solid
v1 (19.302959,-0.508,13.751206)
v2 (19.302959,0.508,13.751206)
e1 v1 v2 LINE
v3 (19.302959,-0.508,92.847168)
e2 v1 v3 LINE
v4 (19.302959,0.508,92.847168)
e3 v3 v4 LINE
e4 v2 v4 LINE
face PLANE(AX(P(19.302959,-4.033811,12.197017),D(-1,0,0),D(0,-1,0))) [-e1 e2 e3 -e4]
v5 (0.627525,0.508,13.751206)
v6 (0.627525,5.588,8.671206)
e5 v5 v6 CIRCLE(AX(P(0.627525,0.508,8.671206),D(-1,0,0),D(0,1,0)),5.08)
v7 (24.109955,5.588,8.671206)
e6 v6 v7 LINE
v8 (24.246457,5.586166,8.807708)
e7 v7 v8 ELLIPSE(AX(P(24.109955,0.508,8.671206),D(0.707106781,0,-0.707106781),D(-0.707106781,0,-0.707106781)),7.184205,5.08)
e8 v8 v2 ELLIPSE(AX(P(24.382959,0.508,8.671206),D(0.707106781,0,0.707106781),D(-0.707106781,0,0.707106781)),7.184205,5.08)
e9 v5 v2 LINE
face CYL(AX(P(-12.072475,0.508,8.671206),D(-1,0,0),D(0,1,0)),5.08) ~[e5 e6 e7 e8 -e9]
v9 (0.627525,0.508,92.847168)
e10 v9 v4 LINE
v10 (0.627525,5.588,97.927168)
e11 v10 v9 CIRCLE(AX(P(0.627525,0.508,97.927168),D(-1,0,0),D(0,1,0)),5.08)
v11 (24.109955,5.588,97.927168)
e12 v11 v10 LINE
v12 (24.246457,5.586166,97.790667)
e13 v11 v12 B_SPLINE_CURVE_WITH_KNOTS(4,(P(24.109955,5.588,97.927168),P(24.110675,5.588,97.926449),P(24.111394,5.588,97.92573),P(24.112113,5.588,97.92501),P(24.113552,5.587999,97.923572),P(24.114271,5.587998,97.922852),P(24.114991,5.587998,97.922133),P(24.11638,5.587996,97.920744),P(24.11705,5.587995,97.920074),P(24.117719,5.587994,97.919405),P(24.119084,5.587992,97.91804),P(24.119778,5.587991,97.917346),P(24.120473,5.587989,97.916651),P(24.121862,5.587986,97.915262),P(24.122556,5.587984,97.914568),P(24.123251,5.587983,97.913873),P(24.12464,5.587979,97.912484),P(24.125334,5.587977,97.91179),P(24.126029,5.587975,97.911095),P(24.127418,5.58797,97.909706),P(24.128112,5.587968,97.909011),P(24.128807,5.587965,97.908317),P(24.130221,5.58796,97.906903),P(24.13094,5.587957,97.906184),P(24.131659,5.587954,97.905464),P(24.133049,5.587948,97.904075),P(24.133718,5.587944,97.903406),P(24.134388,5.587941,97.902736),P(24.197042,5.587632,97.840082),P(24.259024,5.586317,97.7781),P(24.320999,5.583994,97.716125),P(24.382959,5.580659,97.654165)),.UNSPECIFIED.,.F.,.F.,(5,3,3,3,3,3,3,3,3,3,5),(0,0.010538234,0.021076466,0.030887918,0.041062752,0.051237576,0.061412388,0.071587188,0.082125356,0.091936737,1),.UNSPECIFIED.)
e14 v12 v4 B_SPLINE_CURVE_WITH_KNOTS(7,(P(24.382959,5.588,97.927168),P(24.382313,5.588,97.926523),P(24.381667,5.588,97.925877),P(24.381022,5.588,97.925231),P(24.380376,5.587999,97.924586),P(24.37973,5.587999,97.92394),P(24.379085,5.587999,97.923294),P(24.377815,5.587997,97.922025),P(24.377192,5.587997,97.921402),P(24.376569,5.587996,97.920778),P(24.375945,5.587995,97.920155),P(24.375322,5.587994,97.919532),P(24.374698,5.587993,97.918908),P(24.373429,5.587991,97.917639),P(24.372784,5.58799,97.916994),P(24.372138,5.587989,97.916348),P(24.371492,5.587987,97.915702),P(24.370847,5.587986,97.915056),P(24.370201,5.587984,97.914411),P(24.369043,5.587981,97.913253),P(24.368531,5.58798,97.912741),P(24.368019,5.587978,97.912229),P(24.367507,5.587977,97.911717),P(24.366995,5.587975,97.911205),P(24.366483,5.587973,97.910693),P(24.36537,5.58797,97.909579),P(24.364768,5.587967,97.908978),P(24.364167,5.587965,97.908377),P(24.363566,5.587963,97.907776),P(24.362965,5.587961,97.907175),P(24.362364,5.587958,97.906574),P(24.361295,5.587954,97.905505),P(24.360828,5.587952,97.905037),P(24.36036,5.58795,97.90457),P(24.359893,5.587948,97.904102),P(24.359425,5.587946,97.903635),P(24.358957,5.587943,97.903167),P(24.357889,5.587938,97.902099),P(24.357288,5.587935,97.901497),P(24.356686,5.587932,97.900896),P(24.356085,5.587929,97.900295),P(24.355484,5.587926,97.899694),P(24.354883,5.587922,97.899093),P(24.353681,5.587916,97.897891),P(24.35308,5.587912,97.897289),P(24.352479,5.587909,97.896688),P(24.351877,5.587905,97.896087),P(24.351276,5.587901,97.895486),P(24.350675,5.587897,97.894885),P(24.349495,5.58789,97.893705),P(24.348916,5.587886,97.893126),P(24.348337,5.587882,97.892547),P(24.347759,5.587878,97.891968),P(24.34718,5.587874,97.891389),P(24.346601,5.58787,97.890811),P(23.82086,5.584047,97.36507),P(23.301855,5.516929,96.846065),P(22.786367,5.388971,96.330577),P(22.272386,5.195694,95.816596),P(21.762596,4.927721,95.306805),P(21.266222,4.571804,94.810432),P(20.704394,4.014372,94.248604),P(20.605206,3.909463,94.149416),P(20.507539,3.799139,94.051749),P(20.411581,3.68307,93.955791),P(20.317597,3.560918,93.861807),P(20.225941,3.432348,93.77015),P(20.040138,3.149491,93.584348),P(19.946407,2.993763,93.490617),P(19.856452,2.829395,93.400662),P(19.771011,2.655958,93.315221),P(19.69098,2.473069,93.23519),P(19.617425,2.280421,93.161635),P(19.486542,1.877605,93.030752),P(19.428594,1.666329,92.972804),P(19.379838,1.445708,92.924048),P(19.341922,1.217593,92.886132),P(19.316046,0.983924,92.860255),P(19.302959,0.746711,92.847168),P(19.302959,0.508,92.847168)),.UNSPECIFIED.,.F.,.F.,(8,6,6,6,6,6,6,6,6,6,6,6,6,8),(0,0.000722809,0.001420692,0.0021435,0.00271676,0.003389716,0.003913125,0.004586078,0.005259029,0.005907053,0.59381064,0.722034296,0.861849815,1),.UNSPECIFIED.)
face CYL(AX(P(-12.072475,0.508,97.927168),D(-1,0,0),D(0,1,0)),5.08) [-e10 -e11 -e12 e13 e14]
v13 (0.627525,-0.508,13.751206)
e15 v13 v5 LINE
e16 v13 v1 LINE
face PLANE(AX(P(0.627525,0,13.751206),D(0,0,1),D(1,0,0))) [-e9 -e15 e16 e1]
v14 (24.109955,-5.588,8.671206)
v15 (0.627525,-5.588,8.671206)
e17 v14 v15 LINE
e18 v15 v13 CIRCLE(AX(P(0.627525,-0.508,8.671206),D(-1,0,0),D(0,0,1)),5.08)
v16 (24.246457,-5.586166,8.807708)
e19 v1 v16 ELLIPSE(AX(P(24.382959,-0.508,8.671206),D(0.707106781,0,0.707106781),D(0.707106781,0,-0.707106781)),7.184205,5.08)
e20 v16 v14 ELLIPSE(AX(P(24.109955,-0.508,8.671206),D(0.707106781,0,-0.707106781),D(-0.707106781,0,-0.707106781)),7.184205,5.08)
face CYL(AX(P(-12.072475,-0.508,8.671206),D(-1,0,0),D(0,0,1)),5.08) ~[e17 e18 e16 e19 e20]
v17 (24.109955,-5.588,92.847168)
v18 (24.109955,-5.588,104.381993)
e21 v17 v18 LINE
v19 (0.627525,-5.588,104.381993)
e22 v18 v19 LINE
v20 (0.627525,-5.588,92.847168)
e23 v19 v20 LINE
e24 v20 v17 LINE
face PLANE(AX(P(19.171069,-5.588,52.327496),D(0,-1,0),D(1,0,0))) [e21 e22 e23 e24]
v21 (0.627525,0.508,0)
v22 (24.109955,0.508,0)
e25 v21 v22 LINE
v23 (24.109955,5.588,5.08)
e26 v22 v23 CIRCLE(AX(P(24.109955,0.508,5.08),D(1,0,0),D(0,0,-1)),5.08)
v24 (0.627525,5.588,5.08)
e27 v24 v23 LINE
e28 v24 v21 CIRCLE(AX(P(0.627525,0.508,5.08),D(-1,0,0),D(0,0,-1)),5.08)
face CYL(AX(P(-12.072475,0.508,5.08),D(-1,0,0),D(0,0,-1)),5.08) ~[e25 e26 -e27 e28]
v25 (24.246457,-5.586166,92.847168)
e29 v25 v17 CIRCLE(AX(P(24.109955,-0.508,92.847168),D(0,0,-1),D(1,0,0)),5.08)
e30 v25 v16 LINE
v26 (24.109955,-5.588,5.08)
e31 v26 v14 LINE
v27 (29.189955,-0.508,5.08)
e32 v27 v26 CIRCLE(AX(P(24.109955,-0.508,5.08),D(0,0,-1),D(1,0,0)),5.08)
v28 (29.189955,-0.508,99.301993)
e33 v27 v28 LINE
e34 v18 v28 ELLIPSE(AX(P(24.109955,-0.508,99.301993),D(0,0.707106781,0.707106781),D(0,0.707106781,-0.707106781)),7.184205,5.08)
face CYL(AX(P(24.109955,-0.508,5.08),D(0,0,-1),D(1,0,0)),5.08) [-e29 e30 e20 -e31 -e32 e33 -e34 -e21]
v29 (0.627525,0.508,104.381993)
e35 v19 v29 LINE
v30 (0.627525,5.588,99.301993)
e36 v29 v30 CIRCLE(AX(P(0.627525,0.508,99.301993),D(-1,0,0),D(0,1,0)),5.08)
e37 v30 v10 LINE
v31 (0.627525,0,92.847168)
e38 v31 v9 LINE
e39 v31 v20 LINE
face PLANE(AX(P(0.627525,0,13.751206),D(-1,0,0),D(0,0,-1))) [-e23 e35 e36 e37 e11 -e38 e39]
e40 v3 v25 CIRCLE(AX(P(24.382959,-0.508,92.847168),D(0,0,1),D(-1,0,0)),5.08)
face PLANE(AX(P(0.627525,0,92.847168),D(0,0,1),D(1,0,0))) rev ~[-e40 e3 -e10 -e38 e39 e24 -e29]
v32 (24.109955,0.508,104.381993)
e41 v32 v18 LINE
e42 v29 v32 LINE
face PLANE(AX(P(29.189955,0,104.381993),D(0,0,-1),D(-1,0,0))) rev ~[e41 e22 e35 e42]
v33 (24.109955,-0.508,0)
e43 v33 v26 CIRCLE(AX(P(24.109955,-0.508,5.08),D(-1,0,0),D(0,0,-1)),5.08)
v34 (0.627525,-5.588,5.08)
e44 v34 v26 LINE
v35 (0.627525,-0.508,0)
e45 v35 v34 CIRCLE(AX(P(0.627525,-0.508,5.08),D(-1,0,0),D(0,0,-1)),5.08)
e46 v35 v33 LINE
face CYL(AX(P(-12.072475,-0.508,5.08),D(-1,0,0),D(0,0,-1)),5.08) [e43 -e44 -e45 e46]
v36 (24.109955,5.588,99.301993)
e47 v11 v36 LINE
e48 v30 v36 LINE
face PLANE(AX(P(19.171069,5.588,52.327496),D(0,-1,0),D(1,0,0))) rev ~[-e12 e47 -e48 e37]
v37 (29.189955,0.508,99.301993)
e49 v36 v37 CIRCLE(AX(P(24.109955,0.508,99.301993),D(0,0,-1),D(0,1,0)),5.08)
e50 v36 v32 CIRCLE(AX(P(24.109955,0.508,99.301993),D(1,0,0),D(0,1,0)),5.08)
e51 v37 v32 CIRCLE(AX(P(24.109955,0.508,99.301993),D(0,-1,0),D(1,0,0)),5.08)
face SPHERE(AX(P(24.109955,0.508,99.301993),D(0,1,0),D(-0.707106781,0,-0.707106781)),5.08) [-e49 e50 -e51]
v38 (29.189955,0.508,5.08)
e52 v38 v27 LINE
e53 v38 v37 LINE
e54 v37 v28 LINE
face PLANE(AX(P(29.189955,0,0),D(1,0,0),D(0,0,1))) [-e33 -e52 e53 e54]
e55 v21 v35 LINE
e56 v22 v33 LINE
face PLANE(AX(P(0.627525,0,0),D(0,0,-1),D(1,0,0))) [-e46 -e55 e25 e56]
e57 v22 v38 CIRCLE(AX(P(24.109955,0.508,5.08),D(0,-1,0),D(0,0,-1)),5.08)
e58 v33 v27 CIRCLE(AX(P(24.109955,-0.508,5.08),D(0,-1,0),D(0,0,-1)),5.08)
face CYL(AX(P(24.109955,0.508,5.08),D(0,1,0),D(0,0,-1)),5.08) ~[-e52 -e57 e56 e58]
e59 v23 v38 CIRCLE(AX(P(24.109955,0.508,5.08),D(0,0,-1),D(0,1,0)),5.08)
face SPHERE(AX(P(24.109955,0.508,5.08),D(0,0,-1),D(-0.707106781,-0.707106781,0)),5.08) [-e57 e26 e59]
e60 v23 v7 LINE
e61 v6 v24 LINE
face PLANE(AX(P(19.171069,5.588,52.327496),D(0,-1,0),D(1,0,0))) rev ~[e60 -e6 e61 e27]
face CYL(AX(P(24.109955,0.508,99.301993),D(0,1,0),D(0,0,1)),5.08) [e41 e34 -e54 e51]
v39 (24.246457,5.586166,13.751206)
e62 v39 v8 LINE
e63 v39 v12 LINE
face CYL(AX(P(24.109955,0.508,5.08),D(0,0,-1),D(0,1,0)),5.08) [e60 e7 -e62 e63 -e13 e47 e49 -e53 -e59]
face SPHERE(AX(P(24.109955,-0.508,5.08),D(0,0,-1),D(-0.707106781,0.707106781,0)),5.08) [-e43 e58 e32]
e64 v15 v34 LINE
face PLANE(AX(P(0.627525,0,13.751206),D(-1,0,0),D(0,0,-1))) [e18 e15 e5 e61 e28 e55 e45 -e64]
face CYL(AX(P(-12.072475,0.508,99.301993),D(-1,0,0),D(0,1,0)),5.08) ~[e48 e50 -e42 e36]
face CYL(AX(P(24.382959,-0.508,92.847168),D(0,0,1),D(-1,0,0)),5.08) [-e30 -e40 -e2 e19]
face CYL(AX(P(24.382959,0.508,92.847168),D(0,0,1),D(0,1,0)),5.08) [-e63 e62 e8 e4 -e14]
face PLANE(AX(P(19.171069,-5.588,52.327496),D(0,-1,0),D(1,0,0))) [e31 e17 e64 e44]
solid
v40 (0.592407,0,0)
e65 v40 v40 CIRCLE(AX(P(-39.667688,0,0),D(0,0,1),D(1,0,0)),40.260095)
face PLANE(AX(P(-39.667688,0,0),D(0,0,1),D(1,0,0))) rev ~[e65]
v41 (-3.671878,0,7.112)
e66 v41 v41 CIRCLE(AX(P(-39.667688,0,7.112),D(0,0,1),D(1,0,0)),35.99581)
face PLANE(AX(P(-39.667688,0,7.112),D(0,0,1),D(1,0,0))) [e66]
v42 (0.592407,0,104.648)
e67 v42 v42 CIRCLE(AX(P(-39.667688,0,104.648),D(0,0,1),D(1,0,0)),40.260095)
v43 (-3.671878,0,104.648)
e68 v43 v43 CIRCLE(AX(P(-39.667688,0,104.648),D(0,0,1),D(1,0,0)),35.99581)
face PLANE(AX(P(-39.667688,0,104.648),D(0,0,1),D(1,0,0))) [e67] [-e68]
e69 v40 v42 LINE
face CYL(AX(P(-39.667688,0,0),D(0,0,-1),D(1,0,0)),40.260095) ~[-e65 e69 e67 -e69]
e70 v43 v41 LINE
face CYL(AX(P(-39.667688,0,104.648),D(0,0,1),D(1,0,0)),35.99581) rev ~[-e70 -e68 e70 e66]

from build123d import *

# Parameters (mm, degrees)
F0_R         = 40.2600949405
F1_DEPTH     = 104.648
F2_R         = 35.9958099421
F3_DEPTH     = 97.536
F4_W         = 18.675433821
F4_H         = 79.0959624574
F5_DEPTH     = 5.588
F6_DEPTH     = 5.588
F7_DEPTH     = 72.39
F8_T1_DEPTH  = 18.796
F8_T3_DEPTH  = 1.016
F8_T5_DEPTH  = 31.375433821
F8_T7_DEPTH  = 79.0959624574
F8_T9_DEPTH  = 112.001993413
F8_T11_DEPTH = 94.221993413
F8_T13_DEPTH = 36.1824306416
F8_S17_W     = 5.08
F8_S17_H     = 5.08
F8_T18_DEPTH = 5.08
F8_S23_W     = 5.08
F8_S23_H     = 5.08
F8_T24_DEPTH = 5.08
F8_S29_W     = 5.08
F8_S29_H     = 5.08
F8_T30_DEPTH = 5.08
F8_T37_DEPTH = 44.075433821
F8_T41_DEPTH = 91.7959624574
F8_T48_DEPTH = 44.075433821
F8_T52_DEPTH = 91.7959624574
F8_T59_DEPTH = 91.7959624574
F8_T63_DEPTH = 44.075433821


# Not quite as in the source:
# - a fillet or chamfer that OpenCascade refuses, or shapes differently, is made with other operations: its cross-section is extruded or revolved along the edge and cut away or added


with BuildPart() as f1:
    # F0 (on Top) → F1 (new body)
    with BuildSketch(Plane.XY):
        with Locations((-39.6676883101, 0)):
            Circle(F0_R)
    extrude(amount=F1_DEPTH)

    # F2 (on face) → F3 (cut)
    with BuildSketch(Plane.XY.offset(104.648)):
        with Locations((-39.6676883101, 0)):
            Circle(F2_R)
    extrude(amount=-F3_DEPTH, mode=Mode.SUBTRACT)


with BuildPart() as f5:
    # F4 (on Front) → F5 (new body)
    with BuildSketch(Plane.XZ):
        Polygon((0.6275248015, 13.7512059882), (0.6275248015, 0), (29.1899554431, 0), (29.1899554431, 104.381993413), (0.6275248015, 104.381993413), (0.6275248015, 92.8471684456), (19.3029586226, 92.8471684456), (19.3029586226, 13.7512059882), align=None)
        with Locations((9.9652417121, 53.2991872169)):
            Rectangle(F4_W, F4_H)
    extrude(amount=F5_DEPTH)

    # F4 (on Front) → F6 (join)
    with BuildSketch(Plane.XZ):
        Polygon((0.6275248015, 13.7512059882), (0.6275248015, 0), (29.1899554431, 0), (29.1899554431, 104.381993413), (0.6275248015, 104.381993413), (0.6275248015, 92.8471684456), (19.3029586226, 92.8471684456), (19.3029586226, 13.7512059882), align=None)
    extrude(amount=-F6_DEPTH)

    # F4 (on Front) → F7 (cut)
    with BuildSketch(Plane.XZ):
        with Locations((9.9652417121, 53.2991872169)):
            Rectangle(F4_W, F4_H)
    extrude(amount=F7_DEPTH, mode=Mode.SUBTRACT)

    # F8: fillet of radius 5.08 on 12 edges, made by hand

    # F8_s2 → F8_t1 (cut)
    with BuildSketch(Plane.XZ.offset(-0.508)):
        with BuildLine():
            ThreePointArc((24.1099554431, 104.381993413), (27.7020578916, 102.8940958614), (29.1899554431, 99.301993413))
            Line((29.1899554431, 99.301993413), (29.1899554431, 104.381993413))
            Line((29.1899554431, 104.381993413), (24.1099554431, 104.381993413))
        make_face()
    extrude(amount=F8_T1_DEPTH, mode=Mode.SUBTRACT)

    # F8_s4 → F8_t3 (cut)
    with BuildSketch(Plane.XZ.offset(-0.508)):
        with BuildLine():
            ThreePointArc((24.1099554431, 0), (27.7020578916, 1.4878975516), (29.1899554431, 5.08))
            Line((29.1899554431, 5.08), (29.1899554431, 0))
            Line((29.1899554431, 0), (24.1099554431, 0))
        make_face()
    extrude(amount=F8_T3_DEPTH, mode=Mode.SUBTRACT)

    # F8_s6 → F8_t5 (cut)
    with BuildSketch(Plane.YZ.offset(-12.0724751985)):
        with BuildLine():
            ThreePointArc((-0.508, 13.7512059882), (-4.1001024484, 12.2633084367), (-5.588, 8.6712059882))
            Line((-5.588, 8.6712059882), (-5.588, 13.7512059882))
            Line((-5.588, 13.7512059882), (-0.508, 13.7512059882))
        make_face()
        with BuildLine():
            ThreePointArc((5.588, 97.9271684456), (4.1001024484, 94.3350659972), (0.508, 92.8471684456))
            Line((0.508, 92.8471684456), (5.588, 92.8471684456))
            Line((5.588, 92.8471684456), (5.588, 97.9271684456))
        make_face()
        with BuildLine():
            ThreePointArc((5.588, 8.6712059882), (4.1001024484, 12.2633084367), (0.508, 13.7512059882))
            Line((0.508, 13.7512059882), (5.588, 13.7512059882))
            Line((5.588, 13.7512059882), (5.588, 8.6712059882))
        make_face()
    extrude(amount=F8_T5_DEPTH, mode=Mode.SUBTRACT)

    # F8_s8 → F8_t7 (cut)
    with BuildSketch(Plane.XY.offset(13.7512059882)):
        with BuildLine():
            ThreePointArc((19.3029586226, -0.508), (20.7908561741, -4.1001024484), (24.3829586226, -5.588))
            Line((24.3829586226, -5.588), (19.3029586226, -5.588))
            Line((19.3029586226, -5.588), (19.3029586226, -0.508))
        make_face()
        with BuildLine():
            ThreePointArc((24.3829586226, 5.588), (20.7908561741, 4.1001024484), (19.3029586226, 0.508))
            Line((19.3029586226, 0.508), (19.3029586226, 5.588))
            Line((19.3029586226, 5.588), (24.3829586226, 5.588))
        make_face()
    extrude(amount=F8_T7_DEPTH, mode=Mode.SUBTRACT)

    # F8_s10 → F8_t9 (cut)
    with BuildSketch(Plane.XY.offset(5.08)):
        with BuildLine():
            ThreePointArc((29.1899554431, -0.508), (27.7020578916, -4.1001024484), (24.1099554431, -5.588))
            Line((24.1099554431, -5.588), (29.1899554431, -5.588))
            Line((29.1899554431, -5.588), (29.1899554431, -0.508))
        make_face()
    extrude(amount=F8_T9_DEPTH, mode=Mode.SUBTRACT)

    # F8_s12 → F8_t11 (cut)
    with BuildSketch(Plane.XY.offset(5.08)):
        with BuildLine():
            ThreePointArc((24.1099554431, 5.588), (27.7020578916, 4.1001024484), (29.1899554431, 0.508))
            Line((29.1899554431, 0.508), (29.1899554431, 5.588))
            Line((29.1899554431, 5.588), (24.1099554431, 5.588))
        make_face()
    extrude(amount=F8_T11_DEPTH, mode=Mode.SUBTRACT)

    # F8_s14 → F8_t13 (cut)
    with BuildSketch(Plane.YZ.offset(-12.0724751985)):
        with BuildLine():
            ThreePointArc((5.588, 99.301993413), (4.1001024484, 102.8940958614), (0.508, 104.381993413))
            Line((0.508, 104.381993413), (5.588, 104.381993413))
            Line((5.588, 104.381993413), (5.588, 99.301993413))
        make_face()
        with BuildLine():
            ThreePointArc((0.508, 0), (4.1001024484, 1.4878975516), (5.588, 5.08))
            Line((5.588, 5.08), (5.588, 0))
            Line((5.588, 0), (0.508, 0))
        make_face()
        with BuildLine():
            ThreePointArc((-0.508, 0), (-4.1001024484, 1.4878975516), (-5.588, 5.08))
            Line((-5.588, 5.08), (-5.588, 0))
            Line((-5.588, 0), (-0.508, 0))
        make_face()
    extrude(amount=F8_T13_DEPTH, mode=Mode.SUBTRACT)


with BuildPart() as f8_tool16:
    # F8_s17 → F8_t18 (new body)
    with BuildSketch(Plane.XZ.offset(-0.508)):
        with Locations((26.6499554431, 101.841993413)):
            Rectangle(F8_S17_W, F8_S17_H)
    extrude(amount=-F8_T18_DEPTH)

    # F8_s19 → F8_t20 (revolve, cut)
    with BuildSketch(Plane(origin=(24.1099554431, 0.508, 99.301993413), x_dir=(-0.7071067812, 0, -0.7071067812), z_dir=(0.7071067812, 0, -0.7071067812))):
        with BuildLine():
            ThreePointArc((0, -5.08), (5.08, 0), (0, 5.08))
            Line((0, 5.08), (0, -5.08))
        make_face()
    revolve(axis=Axis((24.1099554431, 0.508, 99.301993413), (0, 1, 0)), mode=Mode.SUBTRACT)


with BuildPart() as f5_1:
    add(f5.part)

    # F8_t15: cut F8_tool16
    add(f8_tool16.part, mode=Mode.SUBTRACT)


with BuildPart() as f8_tool22:
    # F8_s23 → F8_t24 (new body)
    with BuildSketch(Plane.XY.offset(5.08)):
        with Locations((26.6499554431, 3.048)):
            Rectangle(F8_S23_W, F8_S23_H)
    extrude(amount=-F8_T24_DEPTH)

    # F8_s25 → F8_t26 (revolve, cut)
    with BuildSketch(Plane(origin=(24.1099554431, 0.508, 5.08), x_dir=(-0.7071067812, -0.7071067812, 0), z_dir=(0.7071067812, -0.7071067812, 0))):
        with BuildLine():
            ThreePointArc((0, -5.08), (5.08, 0), (0, 5.08))
            Line((0, 5.08), (0, -5.08))
        make_face()
    revolve(axis=Axis((24.1099554431, 0.508, 5.08), (0, 0, -1)), mode=Mode.SUBTRACT)


with BuildPart() as f5_2:
    add(f5_1.part)

    # F8_t21: cut F8_tool22
    add(f8_tool22.part, mode=Mode.SUBTRACT)


with BuildPart() as f8_tool28:
    # F8_s29 → F8_t30 (new body)
    with BuildSketch(Plane.XY.offset(5.08)):
        with Locations((26.6499554431, -3.048)):
            Rectangle(F8_S29_W, F8_S29_H)
    extrude(amount=-F8_T30_DEPTH)

    # F8_s31 → F8_t32 (revolve, cut)
    with BuildSketch(Plane(origin=(24.1099554431, -0.508, 5.08), x_dir=(-0.7071067812, 0.7071067812, 0), z_dir=(-0.7071067812, -0.7071067812, 0))):
        with BuildLine():
            ThreePointArc((0, -5.08), (5.08, 0), (0, 5.08))
            Line((0, 5.08), (0, -5.08))
        make_face()
    revolve(axis=Axis((24.1099554431, -0.508, 5.08), (0, 0, -1)), mode=Mode.SUBTRACT)


with BuildPart() as f5_3:
    add(f5_2.part)

    # F8_t27: cut F8_tool28
    add(f8_tool28.part, mode=Mode.SUBTRACT)


with BuildPart() as f8_tool35:
    # F8_s36 → F8_t37 (new body)
    with BuildSketch(Plane.YZ.offset(32.0029586226)):
        with BuildLine():
            ThreePointArc((-0.508, 13.7512059882), (-4.1001024484, 12.2633084367), (-5.588, 8.6712059882))
            Line((-5.588, 8.6712059882), (-5.588, 13.7512059882))
            Line((-5.588, 13.7512059882), (-0.508, 13.7512059882))
        make_face()
    extrude(amount=-F8_T37_DEPTH)

    split(bisect_by=Plane.YZ.offset(19.3029586226), keep=Keep.TOP)


with BuildPart() as f8_tool39:
    # F8_s40 → F8_t41 (new body)
    with BuildSketch(Plane.XY.offset(92.8471684456)):
        with BuildLine():
            ThreePointArc((19.3029586226, -0.508), (20.7908561741, -4.1001024484), (24.3829586226, -5.588))
            Line((24.3829586226, -5.588), (19.3029586226, -5.588))
            Line((19.3029586226, -5.588), (19.3029586226, -0.508))
        make_face()
    extrude(amount=-F8_T41_DEPTH)

    split(bisect_by=Plane.XY.offset(13.7512059882), keep=Keep.BOTTOM)


with BuildPart() as f8_tool35_1:
    add(f8_tool35.part)

    # F8_t43: intersect F8_tool39
    add(f8_tool39.part, mode=Mode.INTERSECT)


with BuildPart() as f5_4:
    add(f5_3.part)

    # F8_t33: cut F8_tool35
    add(f8_tool35_1.part, mode=Mode.SUBTRACT)


with BuildPart() as f8_tool46:
    # F8_s47 → F8_t48 (new body)
    with BuildSketch(Plane.YZ.offset(-12.0724751985)):
        with BuildLine():
            ThreePointArc((5.588, 97.9271684456), (4.1001024484, 94.3350659972), (0.508, 92.8471684456))
            Line((0.508, 92.8471684456), (5.588, 92.8471684456))
            Line((5.588, 92.8471684456), (5.588, 97.9271684456))
        make_face()
    extrude(amount=F8_T48_DEPTH)

    split(bisect_by=Plane.YZ.offset(19.3029586226), keep=Keep.TOP)


with BuildPart() as f8_tool50:
    # F8_s51 → F8_t52 (new body)
    with BuildSketch(Plane.XY.offset(105.5471684456)):
        with BuildLine():
            ThreePointArc((24.3829586226, 5.588), (20.7908561741, 4.1001024484), (19.3029586226, 0.508))
            Line((19.3029586226, 0.508), (19.3029586226, 5.588))
            Line((19.3029586226, 5.588), (24.3829586226, 5.588))
        make_face()
    extrude(amount=-F8_T52_DEPTH)

    split(bisect_by=Plane.XY.offset(92.8471684456), keep=Keep.TOP)


with BuildPart() as f8_tool46_1:
    add(f8_tool46.part)

    # F8_t54: intersect F8_tool50
    add(f8_tool50.part, mode=Mode.INTERSECT)


with BuildPart() as f5_5:
    add(f5_4.part)

    # F8_t44: cut F8_tool46
    add(f8_tool46_1.part, mode=Mode.SUBTRACT)


with BuildPart() as f8_tool57:
    # F8_s58 → F8_t59 (new body)
    with BuildSketch(Plane.XY.offset(92.8471684456)):
        with BuildLine():
            ThreePointArc((24.3829586226, 5.588), (20.7908561741, 4.1001024484), (19.3029586226, 0.508))
            Line((19.3029586226, 0.508), (19.3029586226, 5.588))
            Line((19.3029586226, 5.588), (24.3829586226, 5.588))
        make_face()
    extrude(amount=-F8_T59_DEPTH)

    split(bisect_by=Plane.XY.offset(13.7512059882), keep=Keep.BOTTOM)


with BuildPart() as f8_tool61:
    # F8_s62 → F8_t63 (new body)
    with BuildSketch(Plane.YZ.offset(32.0029586226)):
        with BuildLine():
            ThreePointArc((5.588, 8.6712059882), (4.1001024484, 12.2633084367), (0.508, 13.7512059882))
            Line((0.508, 13.7512059882), (5.588, 13.7512059882))
            Line((5.588, 13.7512059882), (5.588, 8.6712059882))
        make_face()
    extrude(amount=-F8_T63_DEPTH)

    split(bisect_by=Plane.YZ.offset(19.3029586226), keep=Keep.TOP)


with BuildPart() as f8_tool57_1:
    add(f8_tool57.part)

    # F8_t65: intersect F8_tool61
    add(f8_tool61.part, mode=Mode.INTERSECT)


with BuildPart() as f5_6:
    add(f5_5.part)

    # F8_t55: cut F8_tool57
    add(f8_tool57_1.part, mode=Mode.SUBTRACT)


solid = Compound([f1.part, f5_6.part])
